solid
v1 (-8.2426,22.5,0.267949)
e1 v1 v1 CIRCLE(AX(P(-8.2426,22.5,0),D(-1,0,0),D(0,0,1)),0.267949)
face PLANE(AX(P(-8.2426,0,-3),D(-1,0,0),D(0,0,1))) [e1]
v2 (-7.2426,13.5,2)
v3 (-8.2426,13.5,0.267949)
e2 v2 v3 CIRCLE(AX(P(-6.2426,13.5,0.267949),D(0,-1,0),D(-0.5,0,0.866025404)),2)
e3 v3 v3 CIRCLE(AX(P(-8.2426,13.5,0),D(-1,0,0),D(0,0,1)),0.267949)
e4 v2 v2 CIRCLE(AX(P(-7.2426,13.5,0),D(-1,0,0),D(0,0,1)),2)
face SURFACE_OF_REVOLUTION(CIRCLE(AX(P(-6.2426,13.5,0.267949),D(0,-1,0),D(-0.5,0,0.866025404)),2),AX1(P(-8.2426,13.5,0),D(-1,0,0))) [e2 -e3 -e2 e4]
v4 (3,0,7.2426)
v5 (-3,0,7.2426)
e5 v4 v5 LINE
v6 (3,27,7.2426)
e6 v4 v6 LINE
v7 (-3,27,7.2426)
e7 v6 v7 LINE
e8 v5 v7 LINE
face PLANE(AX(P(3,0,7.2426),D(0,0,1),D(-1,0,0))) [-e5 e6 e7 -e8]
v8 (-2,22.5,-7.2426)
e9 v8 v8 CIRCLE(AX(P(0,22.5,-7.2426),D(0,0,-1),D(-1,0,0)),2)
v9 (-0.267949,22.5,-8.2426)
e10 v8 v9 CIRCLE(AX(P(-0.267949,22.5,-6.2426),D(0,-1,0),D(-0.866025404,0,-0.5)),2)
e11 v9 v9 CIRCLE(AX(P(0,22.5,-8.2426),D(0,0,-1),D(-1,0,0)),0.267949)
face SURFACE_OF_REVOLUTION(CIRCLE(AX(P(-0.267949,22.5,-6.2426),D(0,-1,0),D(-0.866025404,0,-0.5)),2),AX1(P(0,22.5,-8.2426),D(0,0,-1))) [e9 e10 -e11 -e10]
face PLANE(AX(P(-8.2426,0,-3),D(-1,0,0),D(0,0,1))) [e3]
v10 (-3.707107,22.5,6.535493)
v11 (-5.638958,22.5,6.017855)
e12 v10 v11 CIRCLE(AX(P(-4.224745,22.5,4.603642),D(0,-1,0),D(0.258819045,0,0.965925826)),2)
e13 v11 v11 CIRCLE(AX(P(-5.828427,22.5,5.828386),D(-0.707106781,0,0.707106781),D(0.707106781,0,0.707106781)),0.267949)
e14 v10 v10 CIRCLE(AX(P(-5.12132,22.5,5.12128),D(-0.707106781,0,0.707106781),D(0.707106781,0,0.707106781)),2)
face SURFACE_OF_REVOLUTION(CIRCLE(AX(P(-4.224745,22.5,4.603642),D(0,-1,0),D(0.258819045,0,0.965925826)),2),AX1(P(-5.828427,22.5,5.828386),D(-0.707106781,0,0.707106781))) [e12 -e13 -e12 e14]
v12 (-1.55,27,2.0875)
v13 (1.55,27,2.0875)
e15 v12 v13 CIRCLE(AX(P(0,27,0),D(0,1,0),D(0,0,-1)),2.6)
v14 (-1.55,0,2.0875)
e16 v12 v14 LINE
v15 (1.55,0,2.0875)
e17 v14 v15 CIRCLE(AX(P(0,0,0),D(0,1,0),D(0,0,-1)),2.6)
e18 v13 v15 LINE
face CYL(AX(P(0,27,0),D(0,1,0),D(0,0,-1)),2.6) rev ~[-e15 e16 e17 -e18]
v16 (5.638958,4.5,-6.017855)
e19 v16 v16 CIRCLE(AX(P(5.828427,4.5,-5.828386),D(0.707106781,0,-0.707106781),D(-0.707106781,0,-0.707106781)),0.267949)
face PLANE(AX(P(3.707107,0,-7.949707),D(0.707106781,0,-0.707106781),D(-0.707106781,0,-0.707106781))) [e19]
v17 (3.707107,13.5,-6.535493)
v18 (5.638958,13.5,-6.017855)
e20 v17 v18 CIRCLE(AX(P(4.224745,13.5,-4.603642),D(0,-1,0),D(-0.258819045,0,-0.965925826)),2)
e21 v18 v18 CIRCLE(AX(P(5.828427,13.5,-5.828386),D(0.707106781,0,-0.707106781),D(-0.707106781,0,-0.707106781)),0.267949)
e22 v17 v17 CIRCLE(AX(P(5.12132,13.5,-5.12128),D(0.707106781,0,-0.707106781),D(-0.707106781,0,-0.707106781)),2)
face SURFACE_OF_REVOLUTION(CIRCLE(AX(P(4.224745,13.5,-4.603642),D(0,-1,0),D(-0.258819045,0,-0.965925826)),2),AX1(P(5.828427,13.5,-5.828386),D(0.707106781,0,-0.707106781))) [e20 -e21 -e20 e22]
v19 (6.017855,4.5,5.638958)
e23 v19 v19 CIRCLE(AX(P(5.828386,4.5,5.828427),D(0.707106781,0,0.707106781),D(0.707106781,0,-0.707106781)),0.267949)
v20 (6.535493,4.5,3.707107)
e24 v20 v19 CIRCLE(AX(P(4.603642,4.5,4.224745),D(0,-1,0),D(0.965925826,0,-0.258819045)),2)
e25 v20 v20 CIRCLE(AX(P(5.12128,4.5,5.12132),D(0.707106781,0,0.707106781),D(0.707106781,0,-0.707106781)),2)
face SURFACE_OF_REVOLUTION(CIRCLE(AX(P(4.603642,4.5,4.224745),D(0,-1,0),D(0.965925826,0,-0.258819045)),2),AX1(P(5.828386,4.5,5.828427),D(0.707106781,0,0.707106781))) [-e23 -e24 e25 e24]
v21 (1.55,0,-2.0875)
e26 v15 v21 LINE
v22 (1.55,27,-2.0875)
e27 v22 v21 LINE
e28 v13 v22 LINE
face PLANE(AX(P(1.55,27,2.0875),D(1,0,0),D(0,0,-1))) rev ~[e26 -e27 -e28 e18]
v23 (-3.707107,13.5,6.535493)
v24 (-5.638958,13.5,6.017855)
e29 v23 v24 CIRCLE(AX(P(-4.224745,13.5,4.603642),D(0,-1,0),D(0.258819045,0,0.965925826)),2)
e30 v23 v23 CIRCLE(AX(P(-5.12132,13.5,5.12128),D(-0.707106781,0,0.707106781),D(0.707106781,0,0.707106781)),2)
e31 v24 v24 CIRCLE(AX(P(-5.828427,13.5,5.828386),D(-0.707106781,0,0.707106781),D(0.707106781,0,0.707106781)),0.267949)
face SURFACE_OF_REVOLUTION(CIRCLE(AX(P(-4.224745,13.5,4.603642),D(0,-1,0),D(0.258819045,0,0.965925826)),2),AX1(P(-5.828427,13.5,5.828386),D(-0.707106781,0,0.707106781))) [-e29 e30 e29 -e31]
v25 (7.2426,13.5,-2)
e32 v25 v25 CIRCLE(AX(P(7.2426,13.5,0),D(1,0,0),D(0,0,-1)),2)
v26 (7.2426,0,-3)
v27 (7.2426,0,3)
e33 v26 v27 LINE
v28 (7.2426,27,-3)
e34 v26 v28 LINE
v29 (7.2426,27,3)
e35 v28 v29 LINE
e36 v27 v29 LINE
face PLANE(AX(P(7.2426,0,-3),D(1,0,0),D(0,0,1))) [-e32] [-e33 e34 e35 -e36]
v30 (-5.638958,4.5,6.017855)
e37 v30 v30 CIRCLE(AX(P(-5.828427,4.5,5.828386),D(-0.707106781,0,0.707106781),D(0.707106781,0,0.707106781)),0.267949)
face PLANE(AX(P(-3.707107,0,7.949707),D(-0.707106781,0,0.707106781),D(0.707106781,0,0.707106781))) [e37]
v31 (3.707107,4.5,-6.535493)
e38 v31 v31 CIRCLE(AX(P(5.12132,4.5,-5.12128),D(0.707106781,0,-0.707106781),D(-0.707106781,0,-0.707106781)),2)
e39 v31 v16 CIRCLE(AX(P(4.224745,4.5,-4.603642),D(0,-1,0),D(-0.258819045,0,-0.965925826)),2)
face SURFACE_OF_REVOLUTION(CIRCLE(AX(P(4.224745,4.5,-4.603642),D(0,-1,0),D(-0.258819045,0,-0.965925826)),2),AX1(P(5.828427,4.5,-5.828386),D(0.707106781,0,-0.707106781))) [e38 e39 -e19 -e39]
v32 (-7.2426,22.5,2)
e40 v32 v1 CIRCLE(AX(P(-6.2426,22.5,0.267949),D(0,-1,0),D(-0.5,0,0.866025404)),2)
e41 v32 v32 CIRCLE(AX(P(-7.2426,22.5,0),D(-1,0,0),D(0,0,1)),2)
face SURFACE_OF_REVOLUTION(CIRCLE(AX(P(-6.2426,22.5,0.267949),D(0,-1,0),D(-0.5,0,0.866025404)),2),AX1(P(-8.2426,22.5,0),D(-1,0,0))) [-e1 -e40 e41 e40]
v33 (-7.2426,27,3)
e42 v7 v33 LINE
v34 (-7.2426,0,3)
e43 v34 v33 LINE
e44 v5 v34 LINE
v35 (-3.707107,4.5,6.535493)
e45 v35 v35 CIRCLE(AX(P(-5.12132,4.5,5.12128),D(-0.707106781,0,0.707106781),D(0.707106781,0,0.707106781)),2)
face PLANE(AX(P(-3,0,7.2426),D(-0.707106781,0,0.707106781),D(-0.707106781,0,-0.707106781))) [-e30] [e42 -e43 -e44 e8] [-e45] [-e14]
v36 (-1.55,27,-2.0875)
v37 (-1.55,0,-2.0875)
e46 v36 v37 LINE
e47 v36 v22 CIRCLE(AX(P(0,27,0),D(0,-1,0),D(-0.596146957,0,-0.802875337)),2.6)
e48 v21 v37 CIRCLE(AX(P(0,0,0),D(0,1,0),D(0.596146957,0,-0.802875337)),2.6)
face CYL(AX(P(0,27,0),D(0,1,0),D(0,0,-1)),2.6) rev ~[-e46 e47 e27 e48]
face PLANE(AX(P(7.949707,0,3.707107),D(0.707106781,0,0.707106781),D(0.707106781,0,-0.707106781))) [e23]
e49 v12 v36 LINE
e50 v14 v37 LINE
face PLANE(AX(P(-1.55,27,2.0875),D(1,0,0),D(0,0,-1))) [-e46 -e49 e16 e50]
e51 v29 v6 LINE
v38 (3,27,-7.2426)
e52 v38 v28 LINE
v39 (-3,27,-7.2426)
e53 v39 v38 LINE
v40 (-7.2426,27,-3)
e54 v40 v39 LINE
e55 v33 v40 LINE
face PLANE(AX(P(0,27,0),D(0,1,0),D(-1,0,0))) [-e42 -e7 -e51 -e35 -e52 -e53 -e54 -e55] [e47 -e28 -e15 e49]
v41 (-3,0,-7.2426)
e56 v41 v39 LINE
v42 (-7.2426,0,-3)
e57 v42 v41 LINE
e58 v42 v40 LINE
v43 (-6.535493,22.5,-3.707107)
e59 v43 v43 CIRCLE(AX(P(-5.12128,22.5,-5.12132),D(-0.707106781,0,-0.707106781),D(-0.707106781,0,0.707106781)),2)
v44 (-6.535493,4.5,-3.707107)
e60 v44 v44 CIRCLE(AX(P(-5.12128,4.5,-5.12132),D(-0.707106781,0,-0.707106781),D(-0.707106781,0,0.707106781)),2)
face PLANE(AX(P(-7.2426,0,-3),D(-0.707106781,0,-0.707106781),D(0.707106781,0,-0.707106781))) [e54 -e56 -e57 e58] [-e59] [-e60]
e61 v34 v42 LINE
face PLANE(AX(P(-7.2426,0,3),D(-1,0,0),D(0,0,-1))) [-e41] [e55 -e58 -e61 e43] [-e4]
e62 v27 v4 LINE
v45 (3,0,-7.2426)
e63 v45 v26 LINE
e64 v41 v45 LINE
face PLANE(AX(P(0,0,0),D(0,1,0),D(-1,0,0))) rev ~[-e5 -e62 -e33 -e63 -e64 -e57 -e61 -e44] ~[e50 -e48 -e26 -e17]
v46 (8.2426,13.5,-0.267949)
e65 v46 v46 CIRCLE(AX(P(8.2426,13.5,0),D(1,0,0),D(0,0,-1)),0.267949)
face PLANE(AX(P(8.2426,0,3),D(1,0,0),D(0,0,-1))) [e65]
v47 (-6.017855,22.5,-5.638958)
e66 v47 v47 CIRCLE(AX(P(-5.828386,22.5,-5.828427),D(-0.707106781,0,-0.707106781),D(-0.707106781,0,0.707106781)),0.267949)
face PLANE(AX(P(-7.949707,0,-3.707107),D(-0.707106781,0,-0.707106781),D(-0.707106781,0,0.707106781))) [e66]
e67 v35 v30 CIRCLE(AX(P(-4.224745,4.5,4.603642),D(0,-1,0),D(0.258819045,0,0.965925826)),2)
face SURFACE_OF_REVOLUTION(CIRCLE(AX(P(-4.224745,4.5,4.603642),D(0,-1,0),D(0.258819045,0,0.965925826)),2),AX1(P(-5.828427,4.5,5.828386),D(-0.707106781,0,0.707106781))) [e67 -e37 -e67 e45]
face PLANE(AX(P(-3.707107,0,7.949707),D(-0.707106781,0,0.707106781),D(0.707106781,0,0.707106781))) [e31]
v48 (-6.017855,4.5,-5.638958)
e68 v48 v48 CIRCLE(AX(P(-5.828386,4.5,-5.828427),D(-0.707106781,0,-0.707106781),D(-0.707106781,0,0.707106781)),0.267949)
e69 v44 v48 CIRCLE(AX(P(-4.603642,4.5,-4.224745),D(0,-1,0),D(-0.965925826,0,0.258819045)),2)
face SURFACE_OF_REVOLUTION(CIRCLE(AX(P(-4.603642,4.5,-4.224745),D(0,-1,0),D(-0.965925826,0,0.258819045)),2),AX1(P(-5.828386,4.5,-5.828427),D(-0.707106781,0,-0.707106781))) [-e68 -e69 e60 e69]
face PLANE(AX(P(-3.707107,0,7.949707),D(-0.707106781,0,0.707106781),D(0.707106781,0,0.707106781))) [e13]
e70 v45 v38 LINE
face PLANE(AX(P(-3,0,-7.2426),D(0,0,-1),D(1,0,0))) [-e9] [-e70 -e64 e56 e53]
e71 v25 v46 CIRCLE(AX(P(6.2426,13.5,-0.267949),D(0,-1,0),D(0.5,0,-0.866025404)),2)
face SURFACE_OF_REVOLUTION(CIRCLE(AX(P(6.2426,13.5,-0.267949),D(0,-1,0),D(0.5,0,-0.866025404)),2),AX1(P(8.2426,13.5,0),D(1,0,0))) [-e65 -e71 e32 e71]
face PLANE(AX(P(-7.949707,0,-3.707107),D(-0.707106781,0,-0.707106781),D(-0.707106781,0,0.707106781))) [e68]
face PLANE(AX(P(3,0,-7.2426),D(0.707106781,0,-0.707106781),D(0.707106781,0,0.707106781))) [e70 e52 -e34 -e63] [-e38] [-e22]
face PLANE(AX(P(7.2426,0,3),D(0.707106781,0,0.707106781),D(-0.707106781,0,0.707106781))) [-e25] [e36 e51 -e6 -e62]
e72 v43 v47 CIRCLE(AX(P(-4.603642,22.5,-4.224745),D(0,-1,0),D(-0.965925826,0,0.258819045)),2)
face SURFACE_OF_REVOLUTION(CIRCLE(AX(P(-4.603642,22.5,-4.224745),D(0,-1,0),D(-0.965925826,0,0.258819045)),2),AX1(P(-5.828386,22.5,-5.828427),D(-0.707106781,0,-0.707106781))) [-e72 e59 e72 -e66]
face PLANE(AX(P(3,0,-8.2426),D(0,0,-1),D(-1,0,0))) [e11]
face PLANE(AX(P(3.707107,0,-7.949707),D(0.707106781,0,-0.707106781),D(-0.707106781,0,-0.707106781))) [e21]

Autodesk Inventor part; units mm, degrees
ref_plane "YZ Plane" through (0, 0, 0) normal (1, 0, 0) x (0, 1, 0)
ref_plane "XZ Plane" through (0, 0, 0) normal (0, 1, 0) x (-1, 0, 0)
ref_plane "XY Plane" through (0, 0, 0) normal (0, 0, 1) x (1, 0, 0)
sketch "Sketch3" plane through (0, 0, 0) normal (0, 1, 0) x (-1, 0, 0)
  line L0 (-3, -7.2426) -> (-7.2426, -3)
  line L1 (-7.2426, -3) -> (-7.2426, 3)
  line L2 (-7.2426, 3) -> (-3, 7.2426)
  line L3 (-3, 7.2426) -> (3, 7.2426)
  line L4 (3, 7.2426) -> (7.2426, 3)
  line L5 (7.2426, 3) -> (7.2426, -3)
  line L6 (7.2426, -3) -> (3, -7.2426)
  line L7 (3, -7.2426) -> (-3, -7.2426)
  point P0 (0, 0)
  point P1 (0, 0)
  dimension "d3" = 6
extrude "Extrusion2" add sketch "Sketch3" along normal blind 27
sketch "Sketch4" plane through (7.2426, 0, 3) normal (0.7071068, 0, 0.7071068) x (0.7071068, 0, -0.7071068)
  circle A0 centre (-3, 4.5) radius 2
  point P0 (-3, 0)
  dimension "d6" = 4
  dimension "d7" = 4.5
sketch "Sketch5" plane through (7.2426, 0, 3) normal (1, 0, 0) x (0, 0, -1)
  circle A0 centre (3, 13.5) radius 2
  point P0 (3, 0)
  dimension "d8" = 4
  dimension "d9" = 13.5
sketch "Sketch6" plane through (3, 0, -7.2426) normal (0.7071068, 0, -0.7071068) x (-0.7071068, 0, -0.7071068)
  circle A0 centre (-3, 4.5) radius 2
  circle A1 centre (-3, 13.5) radius 2
  point P0 (-3, 0)
  dimension "d10" = 4
  dimension "d11" = 4
  dimension "d12" = 4.5
  dimension "d13" = 9
sketch "Sketch7" plane through (3, 0, -7.2426) normal (0, 0, -1) x (-1, 0, 0)
  circle A0 centre (3, 22.5) radius 2
  point P0 (3, 0)
  dimension "d14" = 4
  dimension "d15" = 22.5
sketch "Sketch8" plane through (-7.2426, 0, -3) normal (-0.7071068, 0, -0.7071068) x (-0.7071068, 0, 0.7071068)
  circle A0 centre (-3, 4.5) radius 2
  circle A1 centre (-3, 22.5) radius 2
  point P0 (-3, 0)
  dimension "d16" = 4
  dimension "d17" = 4.5
  dimension "d18" = 4
  dimension "d19" = 22.5
sketch "Sketch9" plane through (-7.2426, 0, -3) normal (-1, 0, 0) x (0, 0, 1)
  circle A0 centre (3, 13.5) radius 2
  circle A1 centre (3, 22.5) radius 2
  point P0 (3, 0)
  dimension "d20" = 4
  dimension "d21" = 4
  dimension "d22" = 13.5
  dimension "d23" = 22.5
sketch "Sketch10" plane through (-3, 0, 7.2426) normal (-0.7071068, 0, 0.7071068) x (0.7071068, 0, 0.7071068)
  circle A0 centre (-3, 4.5) radius 2
  circle A1 centre (-3, 13.5) radius 2
  circle A2 centre (-3, 22.5) radius 2
  point P0 (-3, 0)
  dimension "d24" = 4
  dimension "d25" = 4
  dimension "d26" = 4
  dimension "d27" = 4.5
  dimension "d28" = 9
  dimension "d29" = 9
extrude "Extrusion3" add sketch "Sketch4" along normal blind 1
extrude "Extrusion4" add sketch "Sketch5" along normal blind 1
extrude "Extrusion5" add sketch "Sketch6" along normal blind 1
extrude "Extrusion6" add sketch "Sketch7" along normal blind 1
extrude "Extrusion7" add sketch "Sketch8" along normal blind 1
extrude "Extrusion8" add sketch "Sketch9" along normal blind 1
extrude "Extrusion9" add sketch "Sketch10" along normal blind 1
fillet "Fillet1" radius 2 12 edges at (-7.2426, 22.5, 4.4142) (-7.2426, 13.5, 4.4142) (-7.2426, 4.5, 4.4142) (-8.2426, 13.5, -2) (-8.2426, 22.5, -2) (-4.4142, 22.5, -7.2426) (-4.4142, 4.5, -7.2426) (2, 22.5, -8.2426) (7.2426, 13.5, -4.4142) (7.2426, 4.5, -4.4142) (8.2426, 13.5, 2) (4.4142, 4.5, 7.2426)
ref_plane "Work Plane1" through (7.2426, 27, -3) normal (0, 1, 0) x (0, 0, -1)
sketch "Sketch12" plane through (7.2426, 27, -3) normal (0, 1, 0) x (0, 0, -1)
  point P0 (-3, 7.2426)
sketch "Sketch13" plane through (7.2426, 27, -3) normal (0, 1, 0) x (0, 0, -1)
  circle A0 centre (-3, 7.2426) radius 2.6
  line L0 (-5.0875, 5.6926) -> (-0.9125, 5.6926)
  line L1 (-5.0875, 8.7926) -> (-0.9125, 8.7926)
  dimension "d52" = 5.2
  dimension "d53" = 1.55
  dimension "d54" = 1.55
extrude "Extrusion10" cut sketch "Sketch13" against normal blind 58.75 contours A0 L0 L1
properties part number "8-Lados"
